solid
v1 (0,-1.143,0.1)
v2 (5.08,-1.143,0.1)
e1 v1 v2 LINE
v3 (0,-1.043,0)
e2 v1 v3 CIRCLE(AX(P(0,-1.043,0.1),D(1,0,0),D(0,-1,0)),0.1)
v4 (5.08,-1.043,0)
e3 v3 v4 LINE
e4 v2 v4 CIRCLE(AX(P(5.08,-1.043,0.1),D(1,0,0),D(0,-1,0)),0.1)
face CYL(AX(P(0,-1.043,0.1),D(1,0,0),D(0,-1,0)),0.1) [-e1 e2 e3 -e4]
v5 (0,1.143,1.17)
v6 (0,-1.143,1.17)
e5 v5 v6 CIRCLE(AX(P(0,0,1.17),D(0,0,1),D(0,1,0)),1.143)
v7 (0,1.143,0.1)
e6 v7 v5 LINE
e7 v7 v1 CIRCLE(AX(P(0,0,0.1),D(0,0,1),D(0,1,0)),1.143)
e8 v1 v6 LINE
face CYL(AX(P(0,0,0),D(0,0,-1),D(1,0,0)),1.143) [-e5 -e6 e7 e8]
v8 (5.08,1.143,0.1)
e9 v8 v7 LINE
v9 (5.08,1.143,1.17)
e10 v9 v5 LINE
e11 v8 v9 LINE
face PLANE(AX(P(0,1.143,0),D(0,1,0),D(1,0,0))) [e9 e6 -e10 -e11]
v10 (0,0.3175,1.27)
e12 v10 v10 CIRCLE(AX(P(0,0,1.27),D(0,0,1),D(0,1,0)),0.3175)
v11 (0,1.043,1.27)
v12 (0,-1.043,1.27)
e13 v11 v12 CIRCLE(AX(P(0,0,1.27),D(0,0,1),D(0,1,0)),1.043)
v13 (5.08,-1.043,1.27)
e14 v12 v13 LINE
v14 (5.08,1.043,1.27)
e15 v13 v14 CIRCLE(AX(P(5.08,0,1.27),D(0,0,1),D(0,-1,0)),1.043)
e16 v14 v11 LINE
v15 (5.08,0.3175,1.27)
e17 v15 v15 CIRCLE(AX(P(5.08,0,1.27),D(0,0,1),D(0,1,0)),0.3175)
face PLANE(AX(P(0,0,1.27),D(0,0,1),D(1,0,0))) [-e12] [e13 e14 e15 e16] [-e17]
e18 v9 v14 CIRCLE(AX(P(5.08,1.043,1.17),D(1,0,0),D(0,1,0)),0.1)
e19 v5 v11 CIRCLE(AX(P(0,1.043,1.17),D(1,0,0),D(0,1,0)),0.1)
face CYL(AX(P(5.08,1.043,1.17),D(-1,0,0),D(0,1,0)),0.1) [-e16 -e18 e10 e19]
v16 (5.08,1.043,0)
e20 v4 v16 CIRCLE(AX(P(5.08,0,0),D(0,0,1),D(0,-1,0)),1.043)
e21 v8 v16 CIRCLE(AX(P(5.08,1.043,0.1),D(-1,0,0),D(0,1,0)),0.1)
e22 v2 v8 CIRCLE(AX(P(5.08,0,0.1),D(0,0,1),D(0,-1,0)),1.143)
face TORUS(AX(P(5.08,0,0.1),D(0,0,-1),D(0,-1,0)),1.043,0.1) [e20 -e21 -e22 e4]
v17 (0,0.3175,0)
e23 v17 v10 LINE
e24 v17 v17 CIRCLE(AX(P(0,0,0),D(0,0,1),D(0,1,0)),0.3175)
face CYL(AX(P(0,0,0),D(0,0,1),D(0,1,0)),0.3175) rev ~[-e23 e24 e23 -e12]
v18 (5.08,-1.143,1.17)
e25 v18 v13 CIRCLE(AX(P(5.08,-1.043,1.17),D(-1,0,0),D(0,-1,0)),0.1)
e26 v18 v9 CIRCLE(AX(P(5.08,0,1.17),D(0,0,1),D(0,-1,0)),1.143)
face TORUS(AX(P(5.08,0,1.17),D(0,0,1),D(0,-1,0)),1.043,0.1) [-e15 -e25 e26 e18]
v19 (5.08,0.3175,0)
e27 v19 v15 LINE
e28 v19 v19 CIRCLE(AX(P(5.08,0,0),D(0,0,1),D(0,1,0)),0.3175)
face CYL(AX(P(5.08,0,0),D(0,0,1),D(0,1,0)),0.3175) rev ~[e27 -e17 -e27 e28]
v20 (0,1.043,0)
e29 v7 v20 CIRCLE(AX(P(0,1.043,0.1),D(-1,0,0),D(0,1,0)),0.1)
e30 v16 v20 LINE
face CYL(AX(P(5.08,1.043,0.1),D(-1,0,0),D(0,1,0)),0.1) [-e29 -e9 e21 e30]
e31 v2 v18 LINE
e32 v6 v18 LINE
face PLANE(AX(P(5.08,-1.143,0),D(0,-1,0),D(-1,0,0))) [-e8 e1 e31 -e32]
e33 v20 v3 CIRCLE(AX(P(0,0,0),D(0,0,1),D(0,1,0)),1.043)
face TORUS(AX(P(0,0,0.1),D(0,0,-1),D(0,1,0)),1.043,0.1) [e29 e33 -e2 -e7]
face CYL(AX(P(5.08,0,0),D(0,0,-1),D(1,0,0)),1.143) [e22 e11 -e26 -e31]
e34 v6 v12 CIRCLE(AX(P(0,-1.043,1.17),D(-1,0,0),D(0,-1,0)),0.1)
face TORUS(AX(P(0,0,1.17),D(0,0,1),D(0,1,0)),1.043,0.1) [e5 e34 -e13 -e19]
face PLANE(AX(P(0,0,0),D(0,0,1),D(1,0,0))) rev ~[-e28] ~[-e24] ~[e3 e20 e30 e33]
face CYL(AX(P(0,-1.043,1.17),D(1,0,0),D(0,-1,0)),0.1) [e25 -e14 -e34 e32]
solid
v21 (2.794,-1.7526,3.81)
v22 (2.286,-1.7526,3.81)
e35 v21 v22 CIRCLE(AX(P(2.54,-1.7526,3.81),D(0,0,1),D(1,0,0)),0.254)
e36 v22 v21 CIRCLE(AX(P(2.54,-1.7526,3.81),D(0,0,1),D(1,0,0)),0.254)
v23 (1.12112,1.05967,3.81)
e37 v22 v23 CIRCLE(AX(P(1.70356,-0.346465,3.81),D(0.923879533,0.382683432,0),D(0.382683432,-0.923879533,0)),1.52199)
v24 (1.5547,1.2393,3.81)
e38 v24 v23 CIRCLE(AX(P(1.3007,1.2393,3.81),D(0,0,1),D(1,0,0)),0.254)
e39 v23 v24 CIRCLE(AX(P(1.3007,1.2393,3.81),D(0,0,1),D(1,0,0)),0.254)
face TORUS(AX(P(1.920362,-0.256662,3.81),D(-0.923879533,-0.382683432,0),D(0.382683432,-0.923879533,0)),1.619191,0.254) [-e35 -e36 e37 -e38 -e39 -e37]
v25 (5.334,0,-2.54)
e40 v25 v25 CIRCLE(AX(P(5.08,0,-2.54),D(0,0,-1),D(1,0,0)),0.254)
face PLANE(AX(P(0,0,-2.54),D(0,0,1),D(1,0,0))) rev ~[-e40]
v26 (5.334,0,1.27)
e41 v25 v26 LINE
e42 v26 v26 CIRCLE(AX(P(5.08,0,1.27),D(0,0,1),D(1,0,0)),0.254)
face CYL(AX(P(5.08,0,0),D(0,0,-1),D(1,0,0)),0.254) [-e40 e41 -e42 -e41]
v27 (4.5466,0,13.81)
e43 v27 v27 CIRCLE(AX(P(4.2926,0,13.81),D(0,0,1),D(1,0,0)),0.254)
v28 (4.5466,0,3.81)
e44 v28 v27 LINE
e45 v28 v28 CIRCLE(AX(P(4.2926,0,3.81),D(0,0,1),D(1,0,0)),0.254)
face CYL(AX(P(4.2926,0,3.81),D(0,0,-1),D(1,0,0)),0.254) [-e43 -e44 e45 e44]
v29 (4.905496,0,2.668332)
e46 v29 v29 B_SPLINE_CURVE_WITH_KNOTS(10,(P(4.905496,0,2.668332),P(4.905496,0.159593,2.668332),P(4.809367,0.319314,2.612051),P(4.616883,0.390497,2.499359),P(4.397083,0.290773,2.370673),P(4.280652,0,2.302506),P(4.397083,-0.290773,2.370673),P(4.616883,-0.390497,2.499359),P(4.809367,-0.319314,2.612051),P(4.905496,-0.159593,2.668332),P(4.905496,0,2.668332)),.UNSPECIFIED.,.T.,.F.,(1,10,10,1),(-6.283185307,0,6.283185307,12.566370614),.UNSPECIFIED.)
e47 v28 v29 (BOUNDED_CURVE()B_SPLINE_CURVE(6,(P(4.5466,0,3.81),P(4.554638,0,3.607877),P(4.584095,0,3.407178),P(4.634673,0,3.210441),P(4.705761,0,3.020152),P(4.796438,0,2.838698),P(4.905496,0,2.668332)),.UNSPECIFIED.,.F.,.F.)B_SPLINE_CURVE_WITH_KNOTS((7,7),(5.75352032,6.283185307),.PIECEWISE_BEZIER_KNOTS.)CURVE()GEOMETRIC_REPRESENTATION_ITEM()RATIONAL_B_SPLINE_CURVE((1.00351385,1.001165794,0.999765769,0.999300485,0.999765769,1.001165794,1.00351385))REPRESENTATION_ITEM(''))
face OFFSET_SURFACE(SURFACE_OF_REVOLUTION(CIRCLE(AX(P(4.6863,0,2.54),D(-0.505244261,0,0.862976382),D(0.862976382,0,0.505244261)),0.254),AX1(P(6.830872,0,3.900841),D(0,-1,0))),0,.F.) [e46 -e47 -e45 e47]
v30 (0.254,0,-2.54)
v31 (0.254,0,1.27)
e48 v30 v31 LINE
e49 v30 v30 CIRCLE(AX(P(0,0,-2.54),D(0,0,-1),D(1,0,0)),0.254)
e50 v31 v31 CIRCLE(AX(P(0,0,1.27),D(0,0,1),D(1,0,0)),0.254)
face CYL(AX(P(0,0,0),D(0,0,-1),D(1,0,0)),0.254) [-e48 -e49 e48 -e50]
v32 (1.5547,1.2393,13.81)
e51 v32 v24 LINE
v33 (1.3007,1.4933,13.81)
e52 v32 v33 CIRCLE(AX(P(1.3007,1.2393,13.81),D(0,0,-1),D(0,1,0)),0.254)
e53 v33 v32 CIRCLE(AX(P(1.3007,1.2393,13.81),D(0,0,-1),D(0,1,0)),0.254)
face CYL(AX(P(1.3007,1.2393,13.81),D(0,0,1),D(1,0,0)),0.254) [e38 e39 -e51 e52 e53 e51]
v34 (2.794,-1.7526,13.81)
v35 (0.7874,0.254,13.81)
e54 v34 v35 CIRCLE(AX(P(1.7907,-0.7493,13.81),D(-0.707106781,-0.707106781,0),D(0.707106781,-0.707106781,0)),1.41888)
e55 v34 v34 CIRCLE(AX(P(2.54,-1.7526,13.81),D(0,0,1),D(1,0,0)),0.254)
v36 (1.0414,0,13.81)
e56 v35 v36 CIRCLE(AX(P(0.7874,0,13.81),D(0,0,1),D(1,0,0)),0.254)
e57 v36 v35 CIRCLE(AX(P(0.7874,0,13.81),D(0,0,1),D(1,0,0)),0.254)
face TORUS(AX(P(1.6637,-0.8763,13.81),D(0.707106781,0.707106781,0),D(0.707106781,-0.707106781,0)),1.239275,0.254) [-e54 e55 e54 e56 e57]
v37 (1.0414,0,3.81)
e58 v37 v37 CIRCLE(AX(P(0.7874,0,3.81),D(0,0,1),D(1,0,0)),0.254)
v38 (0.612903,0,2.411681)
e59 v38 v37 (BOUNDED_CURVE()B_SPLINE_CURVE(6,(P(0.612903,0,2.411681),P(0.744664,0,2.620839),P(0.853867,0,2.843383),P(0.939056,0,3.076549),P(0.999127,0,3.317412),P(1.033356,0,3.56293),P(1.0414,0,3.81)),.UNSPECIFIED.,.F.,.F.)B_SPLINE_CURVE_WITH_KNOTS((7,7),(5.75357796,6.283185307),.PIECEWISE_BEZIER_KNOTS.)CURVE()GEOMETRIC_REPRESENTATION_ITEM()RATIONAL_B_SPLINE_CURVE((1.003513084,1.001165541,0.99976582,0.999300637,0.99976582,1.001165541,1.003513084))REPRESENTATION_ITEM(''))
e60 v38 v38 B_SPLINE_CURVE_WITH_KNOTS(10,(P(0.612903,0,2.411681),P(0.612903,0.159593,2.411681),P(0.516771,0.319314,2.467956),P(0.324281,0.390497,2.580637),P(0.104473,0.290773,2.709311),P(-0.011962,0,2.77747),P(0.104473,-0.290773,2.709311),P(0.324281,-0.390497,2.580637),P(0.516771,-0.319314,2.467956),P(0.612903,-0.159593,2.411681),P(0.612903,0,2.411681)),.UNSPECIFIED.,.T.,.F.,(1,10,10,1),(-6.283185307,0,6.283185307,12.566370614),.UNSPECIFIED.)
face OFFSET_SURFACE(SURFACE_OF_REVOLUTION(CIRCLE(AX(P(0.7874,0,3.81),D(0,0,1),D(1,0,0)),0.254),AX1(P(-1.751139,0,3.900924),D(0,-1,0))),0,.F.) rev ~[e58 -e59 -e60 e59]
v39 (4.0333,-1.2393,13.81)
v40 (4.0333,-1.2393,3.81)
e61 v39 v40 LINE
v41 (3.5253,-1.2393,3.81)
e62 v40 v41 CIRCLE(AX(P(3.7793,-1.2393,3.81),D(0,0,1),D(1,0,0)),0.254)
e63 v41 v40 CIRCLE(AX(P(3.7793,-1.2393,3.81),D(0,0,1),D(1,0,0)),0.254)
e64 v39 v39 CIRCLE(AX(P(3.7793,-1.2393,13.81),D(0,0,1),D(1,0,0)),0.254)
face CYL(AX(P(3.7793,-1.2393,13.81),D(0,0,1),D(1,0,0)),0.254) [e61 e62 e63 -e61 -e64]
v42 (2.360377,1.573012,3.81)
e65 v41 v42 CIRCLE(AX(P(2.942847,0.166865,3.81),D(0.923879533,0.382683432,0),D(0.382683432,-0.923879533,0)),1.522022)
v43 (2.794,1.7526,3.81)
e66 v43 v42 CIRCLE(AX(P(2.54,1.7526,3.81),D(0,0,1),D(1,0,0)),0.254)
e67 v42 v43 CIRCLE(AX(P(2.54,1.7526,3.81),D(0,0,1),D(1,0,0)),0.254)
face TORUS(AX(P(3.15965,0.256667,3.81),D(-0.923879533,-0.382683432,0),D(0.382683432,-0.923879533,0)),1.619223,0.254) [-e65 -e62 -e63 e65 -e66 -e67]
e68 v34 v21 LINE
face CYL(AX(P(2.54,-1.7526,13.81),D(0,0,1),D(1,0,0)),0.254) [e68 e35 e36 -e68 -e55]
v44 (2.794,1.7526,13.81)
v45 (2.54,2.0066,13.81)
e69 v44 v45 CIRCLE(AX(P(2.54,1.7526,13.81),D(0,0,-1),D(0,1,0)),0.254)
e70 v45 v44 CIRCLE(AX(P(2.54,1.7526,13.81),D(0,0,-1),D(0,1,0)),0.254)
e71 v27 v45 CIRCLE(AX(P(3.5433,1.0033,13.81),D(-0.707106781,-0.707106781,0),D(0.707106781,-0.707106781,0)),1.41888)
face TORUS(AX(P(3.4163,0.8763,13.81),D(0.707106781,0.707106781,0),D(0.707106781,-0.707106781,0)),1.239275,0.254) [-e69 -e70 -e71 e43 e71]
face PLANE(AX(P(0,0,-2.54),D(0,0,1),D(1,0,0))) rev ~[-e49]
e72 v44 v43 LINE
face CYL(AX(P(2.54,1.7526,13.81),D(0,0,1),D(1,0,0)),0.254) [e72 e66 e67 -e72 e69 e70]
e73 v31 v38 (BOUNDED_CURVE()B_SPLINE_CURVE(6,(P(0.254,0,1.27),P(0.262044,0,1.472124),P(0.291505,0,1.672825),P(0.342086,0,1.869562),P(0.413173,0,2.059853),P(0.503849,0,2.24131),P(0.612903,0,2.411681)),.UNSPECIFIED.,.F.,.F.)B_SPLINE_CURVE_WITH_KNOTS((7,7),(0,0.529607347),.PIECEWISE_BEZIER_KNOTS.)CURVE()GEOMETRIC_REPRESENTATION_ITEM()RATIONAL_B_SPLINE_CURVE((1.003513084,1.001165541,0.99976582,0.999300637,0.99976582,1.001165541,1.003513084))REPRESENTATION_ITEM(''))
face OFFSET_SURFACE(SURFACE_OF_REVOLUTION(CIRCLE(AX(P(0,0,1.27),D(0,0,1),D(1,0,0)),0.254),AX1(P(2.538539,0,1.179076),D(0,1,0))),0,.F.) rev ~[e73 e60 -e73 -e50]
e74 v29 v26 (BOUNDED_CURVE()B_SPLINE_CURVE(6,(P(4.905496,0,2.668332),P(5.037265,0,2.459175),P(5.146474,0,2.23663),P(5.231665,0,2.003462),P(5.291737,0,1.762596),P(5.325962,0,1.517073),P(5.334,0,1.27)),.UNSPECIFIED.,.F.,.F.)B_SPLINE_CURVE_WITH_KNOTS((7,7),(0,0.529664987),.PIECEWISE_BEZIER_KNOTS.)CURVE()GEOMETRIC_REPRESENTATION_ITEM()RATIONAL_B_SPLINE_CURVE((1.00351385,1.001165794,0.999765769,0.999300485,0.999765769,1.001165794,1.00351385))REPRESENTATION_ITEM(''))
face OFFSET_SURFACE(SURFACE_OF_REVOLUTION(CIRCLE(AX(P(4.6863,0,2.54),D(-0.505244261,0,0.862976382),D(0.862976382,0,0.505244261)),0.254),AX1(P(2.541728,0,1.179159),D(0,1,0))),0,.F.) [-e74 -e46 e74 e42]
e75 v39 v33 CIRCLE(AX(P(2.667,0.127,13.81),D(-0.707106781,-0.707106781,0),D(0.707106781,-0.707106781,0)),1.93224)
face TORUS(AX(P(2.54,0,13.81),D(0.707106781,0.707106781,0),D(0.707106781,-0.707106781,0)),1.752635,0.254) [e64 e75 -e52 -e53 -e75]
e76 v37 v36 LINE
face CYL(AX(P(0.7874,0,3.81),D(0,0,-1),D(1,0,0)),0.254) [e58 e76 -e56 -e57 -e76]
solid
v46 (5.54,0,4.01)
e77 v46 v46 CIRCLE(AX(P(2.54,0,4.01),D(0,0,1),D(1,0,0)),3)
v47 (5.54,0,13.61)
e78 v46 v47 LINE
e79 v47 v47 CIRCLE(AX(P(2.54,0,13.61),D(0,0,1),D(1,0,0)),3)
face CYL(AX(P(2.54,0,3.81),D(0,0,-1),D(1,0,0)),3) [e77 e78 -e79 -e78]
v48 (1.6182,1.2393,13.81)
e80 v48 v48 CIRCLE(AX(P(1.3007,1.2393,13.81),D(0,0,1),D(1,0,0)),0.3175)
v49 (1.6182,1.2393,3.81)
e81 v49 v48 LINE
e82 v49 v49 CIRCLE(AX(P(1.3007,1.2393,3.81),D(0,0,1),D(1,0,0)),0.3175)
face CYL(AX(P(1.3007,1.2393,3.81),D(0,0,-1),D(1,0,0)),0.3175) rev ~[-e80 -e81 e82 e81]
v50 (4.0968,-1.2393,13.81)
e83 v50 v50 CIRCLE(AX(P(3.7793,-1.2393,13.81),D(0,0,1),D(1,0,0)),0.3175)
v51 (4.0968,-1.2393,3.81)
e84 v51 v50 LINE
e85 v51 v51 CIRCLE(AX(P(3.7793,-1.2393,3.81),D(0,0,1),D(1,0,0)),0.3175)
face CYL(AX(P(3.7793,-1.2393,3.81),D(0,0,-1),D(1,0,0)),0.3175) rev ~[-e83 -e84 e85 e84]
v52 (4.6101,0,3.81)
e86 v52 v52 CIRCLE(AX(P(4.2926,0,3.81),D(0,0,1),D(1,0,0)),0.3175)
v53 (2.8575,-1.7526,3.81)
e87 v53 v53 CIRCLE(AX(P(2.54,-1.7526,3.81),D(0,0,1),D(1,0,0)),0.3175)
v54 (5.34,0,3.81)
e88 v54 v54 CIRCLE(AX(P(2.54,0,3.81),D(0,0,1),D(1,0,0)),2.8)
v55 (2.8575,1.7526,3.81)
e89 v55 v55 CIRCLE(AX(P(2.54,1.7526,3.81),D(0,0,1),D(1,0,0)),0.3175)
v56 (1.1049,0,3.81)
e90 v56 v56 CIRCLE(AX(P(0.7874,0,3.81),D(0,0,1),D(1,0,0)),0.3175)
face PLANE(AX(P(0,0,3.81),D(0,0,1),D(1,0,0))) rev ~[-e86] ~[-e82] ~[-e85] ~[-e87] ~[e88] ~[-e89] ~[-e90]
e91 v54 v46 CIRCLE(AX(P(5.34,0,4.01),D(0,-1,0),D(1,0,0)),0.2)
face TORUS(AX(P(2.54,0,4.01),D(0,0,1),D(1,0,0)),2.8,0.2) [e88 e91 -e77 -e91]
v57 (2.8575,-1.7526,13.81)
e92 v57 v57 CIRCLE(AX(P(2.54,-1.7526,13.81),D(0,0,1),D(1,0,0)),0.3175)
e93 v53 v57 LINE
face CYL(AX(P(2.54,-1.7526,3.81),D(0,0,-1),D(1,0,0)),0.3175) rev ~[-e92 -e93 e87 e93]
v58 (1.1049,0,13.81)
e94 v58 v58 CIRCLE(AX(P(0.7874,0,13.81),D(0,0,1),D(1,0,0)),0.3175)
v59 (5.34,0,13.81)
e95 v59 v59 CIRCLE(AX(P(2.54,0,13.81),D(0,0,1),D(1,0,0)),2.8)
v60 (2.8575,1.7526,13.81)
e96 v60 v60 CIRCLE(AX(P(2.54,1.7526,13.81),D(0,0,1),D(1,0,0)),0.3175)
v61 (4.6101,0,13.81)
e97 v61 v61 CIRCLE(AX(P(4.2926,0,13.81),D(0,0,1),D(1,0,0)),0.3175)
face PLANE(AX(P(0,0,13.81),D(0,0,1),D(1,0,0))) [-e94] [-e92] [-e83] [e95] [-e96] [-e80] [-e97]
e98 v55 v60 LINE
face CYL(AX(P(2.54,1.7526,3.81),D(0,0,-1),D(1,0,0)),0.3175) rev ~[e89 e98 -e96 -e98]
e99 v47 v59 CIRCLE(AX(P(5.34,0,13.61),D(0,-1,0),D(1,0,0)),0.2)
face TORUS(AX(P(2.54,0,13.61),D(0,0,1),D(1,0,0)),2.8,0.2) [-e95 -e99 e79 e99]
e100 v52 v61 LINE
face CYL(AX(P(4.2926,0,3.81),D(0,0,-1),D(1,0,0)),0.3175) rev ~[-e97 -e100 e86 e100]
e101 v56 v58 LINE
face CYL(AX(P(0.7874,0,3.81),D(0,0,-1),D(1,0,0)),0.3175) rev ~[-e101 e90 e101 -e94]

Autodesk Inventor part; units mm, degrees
ref_plane "YZ Plane" through (0, 0, 0) normal (1, 0, 0) x (0, 1, 0)
ref_plane "XZ Plane" through (0, 0, 0) normal (0, 1, 0) x (-1, 0, 0)
sketch "Sketch1" plane through (0, 0, 0) normal (0, 0, 1) x (1, 0, 0)
  circle A0 centre (0, 0) radius 1.143
  circle A1 centre (5.08, 0) radius 1.143
  line L0 (0, 0) -> (0, 1.143) construction
  line L1 (5.08, 0) -> (5.08, 1.143) construction
  line L2 (0, 0) -> (0, -1.143) construction
  line L3 (5.08, 0) -> (5.08, -1.143) construction
  line L4 (0, 1.143) -> (5.08, 1.143)
  line L5 (5.08, -1.143) -> (0, -1.143)
  circle A2 centre (0, 0) radius 0.254
  circle A3 centre (5.08, 0) radius 0.254
  point P0 (1.7349, 0.2538)
  dimension "d0" = 2.286
  dimension "d1" = 2.286
  dimension "d2" = 0
  dimension "d3" = 5.08
  dimension "d4" = 0.508
  dimension "d5" = 0.508
extrude "Extrusion1" add sketch "Sketch1" along normal blind 1.27 contours A0 | A0 L4 A1 L5 | A1 | A2 | A3
hole "Hole1" at (5.08, 0, 0) at (0, 0, 0) direction (0, 0, 1) diameter 0.635 depth 1.27
extrude "Extrusion2" add sketch "Sketch1" along normal up to surface (1.27 mm away) separate body contours A2 | A3
extrude "Extrusion3" add sketch "Sketch1" against normal blind 5.08 contours A2 | A3 bodies 2
ref_plane "Work Plane1" through (0, 0, 3.81) normal (0, 0, 1) x (1, 0, 0)
sketch "Sketch2" plane through (0, 0, 3.81) normal (0, 0, 1) x (1, 0, 0)
  circle A0 centre (5.08, 0) radius 0.254 projected
  circle A1 centre (0, 0) radius 0.254 projected
  line L0 (0, 0) -> (5.08, 0) construction
  circle A2 centre (2.54, 0) radius 3
  circle A3 centre (2.54, 1.7526) radius 0.3175
  circle A4 centre (1.3007, 1.2393) radius 0.3175
  line L1 (2.54, 0) -> (1.3007, 1.2393) construction
  line L2 (2.54, 0) -> (4.2926, 0) construction
  circle A5 centre (0.7874, 0) radius 0.3175
  circle A6 centre (2.54, -1.7526) radius 0.3175
  circle A7 centre (3.7793, -1.2393) radius 0.3175
  circle A8 centre (4.2926, 0) radius 0.3175
  dimension "d20" = 6
  dimension "d24" = 0
  dimension "d26" = 1.7526
  dimension "d27" = 0.635
  dimension "d29" = 0.635
  dimension "d30" = 1.7526
  dimension "d31" = 225
  dimension "d36" = 0.635
  dimension "d37" = 1.7526
  dimension "d40" = 360
extrude "Extrusion4" add sketch "Sketch2" along normal blind 10 separate body contours A0 | A1 | A2
sketch "Sketch3" plane through (0, 0, 0) normal (0, 1, 0) x (-1, 0, 0)
  line L0 (-0.4699, 3.81) -> (-1.1049, 3.81) construction
  line L1 (-0.7874, 3.81) -> (0, 1.27) construction
  line L2 (-0.3175, 1.27) -> (0.3175, 1.27) construction
  line L3 (-5.3975, 1.27) -> (-4.7625, 1.27) construction
  line L4 (-5.08, 1.27) -> (-4.2926, 3.81) construction
  line L5 (-3.9751, 3.81) -> (-4.6101, 3.81) construction
  line L6 (0, 1.27) -> (-5.08, 1.27) construction
  arc A0 (-4.6863, 2.54) -> (-5.08, 1.27) centre (-2.5416, 1.1791) ccw
  line L7 (1.143, 1.27) -> (0, 1.27) projected
  arc A1 (0, 1.27) -> (-0.3937, 2.54) centre (-2.5384, 1.1791) ccw
  arc A2 (-0.7874, 3.81) -> (-0.3937, 2.54) centre (1.751, 3.9009) ccw
  arc A3 (-4.6863, 2.54) -> (-4.2926, 3.81) centre (-6.831, 3.9009) ccw
  point P0 (0, 0)
  dimension "d42" = 2.54
  dimension "d43" = 2.54
  dimension "d44" = 2.54
  dimension "d45" = 2.54
sketch "Sketch4" plane through (5.08, 0, 1.27) normal (0, 0, 1) x (1, 0, 0)
  circle A0 centre (0, 0) radius 0.254 projected
  circle A1 centre (-5.08, 0) radius 0.254 projected
sweep "Sweep1" add profiles "Sketch4" path "Sketch3" bodies 2 path curves A0 A3 contours A0
sweep "Sweep2" add profiles "Sketch4" path "Sketch3" bodies 2 path curves A1 A2 contours A1
sketch "Sketch5" plane through (4.2926, 0, 3.81) normal (0, 0, 1) x (1, 0, 0)
  circle A0 centre (0, 0) radius 0.254 projected
  circle A1 centre (-3.5052, 0) radius 0.254 projected
  point P0 (-4.2926, 0)
  point P1 (0.254, 0)
  point P2 (-3.2512, 0)
extrude "Extrusion5" add sketch "Sketch5" along normal up to surface (10 mm away) bodies 2
sketch "Sketch6" plane through (0.7874, 0, 13.81) normal (0, 0, 1) x (1, 0, 0)
  circle A0 centre (0, 0) radius 0.254 projected
  circle A1 centre (3.5052, 0) radius 0.254 projected
  circle A2 centre (1.7526, 1.7526) radius 0.3175 projected
  circle A3 centre (0.5133, 1.2393) radius 0.3175 projected
  circle A4 centre (1.7526, -1.7526) radius 0.3175 projected
  circle A5 centre (2.9919, -1.2393) radius 0.3175 projected
  circle A6 centre (2.9919, -1.2393) radius 0.254
  line L0 (0, 0) -> (3.5052, 0) construction
  line L1 (1.7526, 0) -> (3.8739, 2.1213) construction
  line L2 (1.7526, 0) -> (4.7526, 0) construction
  circle A7 centre (1.7526, -1.7526) radius 0.254
  circle A8 centre (0.5133, 1.2393) radius 0.254
  circle A9 centre (1.7526, 1.7526) radius 0.254
  point P0 (-0.7874, 0)
  dimension "d52" = 0.508
  dimension "d53" = 0.508
  dimension "d54" = 3
  dimension "d55" = 45
  dimension "d57" = 0.508
  dimension "d59" = 0.508
  dimension "d61" = 0.508
revolve "Revolution1" add sketch "Sketch6" angle 180 about axis through (2.54, 0, 13.81) along (-0.7071068, -0.7071068, 0) bodies 2 contours A1 | A6 | A7
extrude "Extrusion6" add sketch "Sketch6" against normal up to surface (10 mm away) contours A6 | A7 | A8 | A9 bodies 2
sketch "Sketch7" plane through (2.54, -1.7526, 3.81) normal (0, 0, -1) x (-1, 0, 0)
  circle A0 centre (0, 0) radius 0.254 projected
  circle A1 centre (-1.2393, 0.5133) radius 0.254 projected
  circle A2 centre (1.2393, 2.9919) radius 0.254 projected
  circle A3 centre (0, 3.5052) radius 0.254 projected
  circle A4 centre (-1.2393, 0.5133) radius 0.3175 construction
  line L0 (-1.2393, 0.5133) -> (1.2393, 2.9919) construction
  line L1 (0, 0) -> (0, 3.5052) construction
  line L2 (0, 1.7526) -> (-0.8423, 2.1015) construction
  line L3 (1.2393, 2.9919) -> (0, 3.5052) construction
  point P0 (2.54, 1.7526)
revolve "Revolution2" add sketch "Sketch7" angle 180 about axis through (2.54, 0, 3.81) along (0.9238795, 0.3826834, 0) bodies 2 contours A0 | A1
fillet "Fillet1" radius 0.2 2 edges at (-0.46, 0, 13.81) (-0.46, 0, 3.81)
fillet "Fillet2" radius 0.1 8 edges at (-1.143, 0, 1.27) (2.54, -1.143, 1.27) (6.223, 0, 1.27) (2.54, 1.143, 1.27) (-1.143, 0, 0) (2.54, -1.143, 0) (6.223, 0, 0) (2.54, 1.143, 0)
thicken "Thicken4" operation add thickness 2.54 both sides no extend neighbours yes toward (0, 0, 1) bodies 2 faces at (-0.075, -0.0393, -5.08)
thicken "Thicken5" operation add thickness 2.54 both sides no extend neighbours yes toward (0, 0, 1) bodies 2 faces at (4.994, 0.084, -5.08)
equation "\"d1\" = d0"
equation "\"d5\" = d4"
equation "\"d29\" = d27"
equation "\"d30\" = d26"
equation "\"d36\" = d27"
equation "\"d37\" = d26"
equation "\"d43\" = d42"
equation "\"d44\" = d42"
equation "\"d45\" = d43"
equation "\"d52\" = d53"
equation "\"d57\" = d58"
equation "\"d59\" = d60"
equation "\"d61\" = d62"
equation "\"d58\" = 0.508"
equation "\"d60\" = 0.508"
equation "\"d62\" = 0.508"
properties part number "LairdTech_28C0236-0JW-10__"
